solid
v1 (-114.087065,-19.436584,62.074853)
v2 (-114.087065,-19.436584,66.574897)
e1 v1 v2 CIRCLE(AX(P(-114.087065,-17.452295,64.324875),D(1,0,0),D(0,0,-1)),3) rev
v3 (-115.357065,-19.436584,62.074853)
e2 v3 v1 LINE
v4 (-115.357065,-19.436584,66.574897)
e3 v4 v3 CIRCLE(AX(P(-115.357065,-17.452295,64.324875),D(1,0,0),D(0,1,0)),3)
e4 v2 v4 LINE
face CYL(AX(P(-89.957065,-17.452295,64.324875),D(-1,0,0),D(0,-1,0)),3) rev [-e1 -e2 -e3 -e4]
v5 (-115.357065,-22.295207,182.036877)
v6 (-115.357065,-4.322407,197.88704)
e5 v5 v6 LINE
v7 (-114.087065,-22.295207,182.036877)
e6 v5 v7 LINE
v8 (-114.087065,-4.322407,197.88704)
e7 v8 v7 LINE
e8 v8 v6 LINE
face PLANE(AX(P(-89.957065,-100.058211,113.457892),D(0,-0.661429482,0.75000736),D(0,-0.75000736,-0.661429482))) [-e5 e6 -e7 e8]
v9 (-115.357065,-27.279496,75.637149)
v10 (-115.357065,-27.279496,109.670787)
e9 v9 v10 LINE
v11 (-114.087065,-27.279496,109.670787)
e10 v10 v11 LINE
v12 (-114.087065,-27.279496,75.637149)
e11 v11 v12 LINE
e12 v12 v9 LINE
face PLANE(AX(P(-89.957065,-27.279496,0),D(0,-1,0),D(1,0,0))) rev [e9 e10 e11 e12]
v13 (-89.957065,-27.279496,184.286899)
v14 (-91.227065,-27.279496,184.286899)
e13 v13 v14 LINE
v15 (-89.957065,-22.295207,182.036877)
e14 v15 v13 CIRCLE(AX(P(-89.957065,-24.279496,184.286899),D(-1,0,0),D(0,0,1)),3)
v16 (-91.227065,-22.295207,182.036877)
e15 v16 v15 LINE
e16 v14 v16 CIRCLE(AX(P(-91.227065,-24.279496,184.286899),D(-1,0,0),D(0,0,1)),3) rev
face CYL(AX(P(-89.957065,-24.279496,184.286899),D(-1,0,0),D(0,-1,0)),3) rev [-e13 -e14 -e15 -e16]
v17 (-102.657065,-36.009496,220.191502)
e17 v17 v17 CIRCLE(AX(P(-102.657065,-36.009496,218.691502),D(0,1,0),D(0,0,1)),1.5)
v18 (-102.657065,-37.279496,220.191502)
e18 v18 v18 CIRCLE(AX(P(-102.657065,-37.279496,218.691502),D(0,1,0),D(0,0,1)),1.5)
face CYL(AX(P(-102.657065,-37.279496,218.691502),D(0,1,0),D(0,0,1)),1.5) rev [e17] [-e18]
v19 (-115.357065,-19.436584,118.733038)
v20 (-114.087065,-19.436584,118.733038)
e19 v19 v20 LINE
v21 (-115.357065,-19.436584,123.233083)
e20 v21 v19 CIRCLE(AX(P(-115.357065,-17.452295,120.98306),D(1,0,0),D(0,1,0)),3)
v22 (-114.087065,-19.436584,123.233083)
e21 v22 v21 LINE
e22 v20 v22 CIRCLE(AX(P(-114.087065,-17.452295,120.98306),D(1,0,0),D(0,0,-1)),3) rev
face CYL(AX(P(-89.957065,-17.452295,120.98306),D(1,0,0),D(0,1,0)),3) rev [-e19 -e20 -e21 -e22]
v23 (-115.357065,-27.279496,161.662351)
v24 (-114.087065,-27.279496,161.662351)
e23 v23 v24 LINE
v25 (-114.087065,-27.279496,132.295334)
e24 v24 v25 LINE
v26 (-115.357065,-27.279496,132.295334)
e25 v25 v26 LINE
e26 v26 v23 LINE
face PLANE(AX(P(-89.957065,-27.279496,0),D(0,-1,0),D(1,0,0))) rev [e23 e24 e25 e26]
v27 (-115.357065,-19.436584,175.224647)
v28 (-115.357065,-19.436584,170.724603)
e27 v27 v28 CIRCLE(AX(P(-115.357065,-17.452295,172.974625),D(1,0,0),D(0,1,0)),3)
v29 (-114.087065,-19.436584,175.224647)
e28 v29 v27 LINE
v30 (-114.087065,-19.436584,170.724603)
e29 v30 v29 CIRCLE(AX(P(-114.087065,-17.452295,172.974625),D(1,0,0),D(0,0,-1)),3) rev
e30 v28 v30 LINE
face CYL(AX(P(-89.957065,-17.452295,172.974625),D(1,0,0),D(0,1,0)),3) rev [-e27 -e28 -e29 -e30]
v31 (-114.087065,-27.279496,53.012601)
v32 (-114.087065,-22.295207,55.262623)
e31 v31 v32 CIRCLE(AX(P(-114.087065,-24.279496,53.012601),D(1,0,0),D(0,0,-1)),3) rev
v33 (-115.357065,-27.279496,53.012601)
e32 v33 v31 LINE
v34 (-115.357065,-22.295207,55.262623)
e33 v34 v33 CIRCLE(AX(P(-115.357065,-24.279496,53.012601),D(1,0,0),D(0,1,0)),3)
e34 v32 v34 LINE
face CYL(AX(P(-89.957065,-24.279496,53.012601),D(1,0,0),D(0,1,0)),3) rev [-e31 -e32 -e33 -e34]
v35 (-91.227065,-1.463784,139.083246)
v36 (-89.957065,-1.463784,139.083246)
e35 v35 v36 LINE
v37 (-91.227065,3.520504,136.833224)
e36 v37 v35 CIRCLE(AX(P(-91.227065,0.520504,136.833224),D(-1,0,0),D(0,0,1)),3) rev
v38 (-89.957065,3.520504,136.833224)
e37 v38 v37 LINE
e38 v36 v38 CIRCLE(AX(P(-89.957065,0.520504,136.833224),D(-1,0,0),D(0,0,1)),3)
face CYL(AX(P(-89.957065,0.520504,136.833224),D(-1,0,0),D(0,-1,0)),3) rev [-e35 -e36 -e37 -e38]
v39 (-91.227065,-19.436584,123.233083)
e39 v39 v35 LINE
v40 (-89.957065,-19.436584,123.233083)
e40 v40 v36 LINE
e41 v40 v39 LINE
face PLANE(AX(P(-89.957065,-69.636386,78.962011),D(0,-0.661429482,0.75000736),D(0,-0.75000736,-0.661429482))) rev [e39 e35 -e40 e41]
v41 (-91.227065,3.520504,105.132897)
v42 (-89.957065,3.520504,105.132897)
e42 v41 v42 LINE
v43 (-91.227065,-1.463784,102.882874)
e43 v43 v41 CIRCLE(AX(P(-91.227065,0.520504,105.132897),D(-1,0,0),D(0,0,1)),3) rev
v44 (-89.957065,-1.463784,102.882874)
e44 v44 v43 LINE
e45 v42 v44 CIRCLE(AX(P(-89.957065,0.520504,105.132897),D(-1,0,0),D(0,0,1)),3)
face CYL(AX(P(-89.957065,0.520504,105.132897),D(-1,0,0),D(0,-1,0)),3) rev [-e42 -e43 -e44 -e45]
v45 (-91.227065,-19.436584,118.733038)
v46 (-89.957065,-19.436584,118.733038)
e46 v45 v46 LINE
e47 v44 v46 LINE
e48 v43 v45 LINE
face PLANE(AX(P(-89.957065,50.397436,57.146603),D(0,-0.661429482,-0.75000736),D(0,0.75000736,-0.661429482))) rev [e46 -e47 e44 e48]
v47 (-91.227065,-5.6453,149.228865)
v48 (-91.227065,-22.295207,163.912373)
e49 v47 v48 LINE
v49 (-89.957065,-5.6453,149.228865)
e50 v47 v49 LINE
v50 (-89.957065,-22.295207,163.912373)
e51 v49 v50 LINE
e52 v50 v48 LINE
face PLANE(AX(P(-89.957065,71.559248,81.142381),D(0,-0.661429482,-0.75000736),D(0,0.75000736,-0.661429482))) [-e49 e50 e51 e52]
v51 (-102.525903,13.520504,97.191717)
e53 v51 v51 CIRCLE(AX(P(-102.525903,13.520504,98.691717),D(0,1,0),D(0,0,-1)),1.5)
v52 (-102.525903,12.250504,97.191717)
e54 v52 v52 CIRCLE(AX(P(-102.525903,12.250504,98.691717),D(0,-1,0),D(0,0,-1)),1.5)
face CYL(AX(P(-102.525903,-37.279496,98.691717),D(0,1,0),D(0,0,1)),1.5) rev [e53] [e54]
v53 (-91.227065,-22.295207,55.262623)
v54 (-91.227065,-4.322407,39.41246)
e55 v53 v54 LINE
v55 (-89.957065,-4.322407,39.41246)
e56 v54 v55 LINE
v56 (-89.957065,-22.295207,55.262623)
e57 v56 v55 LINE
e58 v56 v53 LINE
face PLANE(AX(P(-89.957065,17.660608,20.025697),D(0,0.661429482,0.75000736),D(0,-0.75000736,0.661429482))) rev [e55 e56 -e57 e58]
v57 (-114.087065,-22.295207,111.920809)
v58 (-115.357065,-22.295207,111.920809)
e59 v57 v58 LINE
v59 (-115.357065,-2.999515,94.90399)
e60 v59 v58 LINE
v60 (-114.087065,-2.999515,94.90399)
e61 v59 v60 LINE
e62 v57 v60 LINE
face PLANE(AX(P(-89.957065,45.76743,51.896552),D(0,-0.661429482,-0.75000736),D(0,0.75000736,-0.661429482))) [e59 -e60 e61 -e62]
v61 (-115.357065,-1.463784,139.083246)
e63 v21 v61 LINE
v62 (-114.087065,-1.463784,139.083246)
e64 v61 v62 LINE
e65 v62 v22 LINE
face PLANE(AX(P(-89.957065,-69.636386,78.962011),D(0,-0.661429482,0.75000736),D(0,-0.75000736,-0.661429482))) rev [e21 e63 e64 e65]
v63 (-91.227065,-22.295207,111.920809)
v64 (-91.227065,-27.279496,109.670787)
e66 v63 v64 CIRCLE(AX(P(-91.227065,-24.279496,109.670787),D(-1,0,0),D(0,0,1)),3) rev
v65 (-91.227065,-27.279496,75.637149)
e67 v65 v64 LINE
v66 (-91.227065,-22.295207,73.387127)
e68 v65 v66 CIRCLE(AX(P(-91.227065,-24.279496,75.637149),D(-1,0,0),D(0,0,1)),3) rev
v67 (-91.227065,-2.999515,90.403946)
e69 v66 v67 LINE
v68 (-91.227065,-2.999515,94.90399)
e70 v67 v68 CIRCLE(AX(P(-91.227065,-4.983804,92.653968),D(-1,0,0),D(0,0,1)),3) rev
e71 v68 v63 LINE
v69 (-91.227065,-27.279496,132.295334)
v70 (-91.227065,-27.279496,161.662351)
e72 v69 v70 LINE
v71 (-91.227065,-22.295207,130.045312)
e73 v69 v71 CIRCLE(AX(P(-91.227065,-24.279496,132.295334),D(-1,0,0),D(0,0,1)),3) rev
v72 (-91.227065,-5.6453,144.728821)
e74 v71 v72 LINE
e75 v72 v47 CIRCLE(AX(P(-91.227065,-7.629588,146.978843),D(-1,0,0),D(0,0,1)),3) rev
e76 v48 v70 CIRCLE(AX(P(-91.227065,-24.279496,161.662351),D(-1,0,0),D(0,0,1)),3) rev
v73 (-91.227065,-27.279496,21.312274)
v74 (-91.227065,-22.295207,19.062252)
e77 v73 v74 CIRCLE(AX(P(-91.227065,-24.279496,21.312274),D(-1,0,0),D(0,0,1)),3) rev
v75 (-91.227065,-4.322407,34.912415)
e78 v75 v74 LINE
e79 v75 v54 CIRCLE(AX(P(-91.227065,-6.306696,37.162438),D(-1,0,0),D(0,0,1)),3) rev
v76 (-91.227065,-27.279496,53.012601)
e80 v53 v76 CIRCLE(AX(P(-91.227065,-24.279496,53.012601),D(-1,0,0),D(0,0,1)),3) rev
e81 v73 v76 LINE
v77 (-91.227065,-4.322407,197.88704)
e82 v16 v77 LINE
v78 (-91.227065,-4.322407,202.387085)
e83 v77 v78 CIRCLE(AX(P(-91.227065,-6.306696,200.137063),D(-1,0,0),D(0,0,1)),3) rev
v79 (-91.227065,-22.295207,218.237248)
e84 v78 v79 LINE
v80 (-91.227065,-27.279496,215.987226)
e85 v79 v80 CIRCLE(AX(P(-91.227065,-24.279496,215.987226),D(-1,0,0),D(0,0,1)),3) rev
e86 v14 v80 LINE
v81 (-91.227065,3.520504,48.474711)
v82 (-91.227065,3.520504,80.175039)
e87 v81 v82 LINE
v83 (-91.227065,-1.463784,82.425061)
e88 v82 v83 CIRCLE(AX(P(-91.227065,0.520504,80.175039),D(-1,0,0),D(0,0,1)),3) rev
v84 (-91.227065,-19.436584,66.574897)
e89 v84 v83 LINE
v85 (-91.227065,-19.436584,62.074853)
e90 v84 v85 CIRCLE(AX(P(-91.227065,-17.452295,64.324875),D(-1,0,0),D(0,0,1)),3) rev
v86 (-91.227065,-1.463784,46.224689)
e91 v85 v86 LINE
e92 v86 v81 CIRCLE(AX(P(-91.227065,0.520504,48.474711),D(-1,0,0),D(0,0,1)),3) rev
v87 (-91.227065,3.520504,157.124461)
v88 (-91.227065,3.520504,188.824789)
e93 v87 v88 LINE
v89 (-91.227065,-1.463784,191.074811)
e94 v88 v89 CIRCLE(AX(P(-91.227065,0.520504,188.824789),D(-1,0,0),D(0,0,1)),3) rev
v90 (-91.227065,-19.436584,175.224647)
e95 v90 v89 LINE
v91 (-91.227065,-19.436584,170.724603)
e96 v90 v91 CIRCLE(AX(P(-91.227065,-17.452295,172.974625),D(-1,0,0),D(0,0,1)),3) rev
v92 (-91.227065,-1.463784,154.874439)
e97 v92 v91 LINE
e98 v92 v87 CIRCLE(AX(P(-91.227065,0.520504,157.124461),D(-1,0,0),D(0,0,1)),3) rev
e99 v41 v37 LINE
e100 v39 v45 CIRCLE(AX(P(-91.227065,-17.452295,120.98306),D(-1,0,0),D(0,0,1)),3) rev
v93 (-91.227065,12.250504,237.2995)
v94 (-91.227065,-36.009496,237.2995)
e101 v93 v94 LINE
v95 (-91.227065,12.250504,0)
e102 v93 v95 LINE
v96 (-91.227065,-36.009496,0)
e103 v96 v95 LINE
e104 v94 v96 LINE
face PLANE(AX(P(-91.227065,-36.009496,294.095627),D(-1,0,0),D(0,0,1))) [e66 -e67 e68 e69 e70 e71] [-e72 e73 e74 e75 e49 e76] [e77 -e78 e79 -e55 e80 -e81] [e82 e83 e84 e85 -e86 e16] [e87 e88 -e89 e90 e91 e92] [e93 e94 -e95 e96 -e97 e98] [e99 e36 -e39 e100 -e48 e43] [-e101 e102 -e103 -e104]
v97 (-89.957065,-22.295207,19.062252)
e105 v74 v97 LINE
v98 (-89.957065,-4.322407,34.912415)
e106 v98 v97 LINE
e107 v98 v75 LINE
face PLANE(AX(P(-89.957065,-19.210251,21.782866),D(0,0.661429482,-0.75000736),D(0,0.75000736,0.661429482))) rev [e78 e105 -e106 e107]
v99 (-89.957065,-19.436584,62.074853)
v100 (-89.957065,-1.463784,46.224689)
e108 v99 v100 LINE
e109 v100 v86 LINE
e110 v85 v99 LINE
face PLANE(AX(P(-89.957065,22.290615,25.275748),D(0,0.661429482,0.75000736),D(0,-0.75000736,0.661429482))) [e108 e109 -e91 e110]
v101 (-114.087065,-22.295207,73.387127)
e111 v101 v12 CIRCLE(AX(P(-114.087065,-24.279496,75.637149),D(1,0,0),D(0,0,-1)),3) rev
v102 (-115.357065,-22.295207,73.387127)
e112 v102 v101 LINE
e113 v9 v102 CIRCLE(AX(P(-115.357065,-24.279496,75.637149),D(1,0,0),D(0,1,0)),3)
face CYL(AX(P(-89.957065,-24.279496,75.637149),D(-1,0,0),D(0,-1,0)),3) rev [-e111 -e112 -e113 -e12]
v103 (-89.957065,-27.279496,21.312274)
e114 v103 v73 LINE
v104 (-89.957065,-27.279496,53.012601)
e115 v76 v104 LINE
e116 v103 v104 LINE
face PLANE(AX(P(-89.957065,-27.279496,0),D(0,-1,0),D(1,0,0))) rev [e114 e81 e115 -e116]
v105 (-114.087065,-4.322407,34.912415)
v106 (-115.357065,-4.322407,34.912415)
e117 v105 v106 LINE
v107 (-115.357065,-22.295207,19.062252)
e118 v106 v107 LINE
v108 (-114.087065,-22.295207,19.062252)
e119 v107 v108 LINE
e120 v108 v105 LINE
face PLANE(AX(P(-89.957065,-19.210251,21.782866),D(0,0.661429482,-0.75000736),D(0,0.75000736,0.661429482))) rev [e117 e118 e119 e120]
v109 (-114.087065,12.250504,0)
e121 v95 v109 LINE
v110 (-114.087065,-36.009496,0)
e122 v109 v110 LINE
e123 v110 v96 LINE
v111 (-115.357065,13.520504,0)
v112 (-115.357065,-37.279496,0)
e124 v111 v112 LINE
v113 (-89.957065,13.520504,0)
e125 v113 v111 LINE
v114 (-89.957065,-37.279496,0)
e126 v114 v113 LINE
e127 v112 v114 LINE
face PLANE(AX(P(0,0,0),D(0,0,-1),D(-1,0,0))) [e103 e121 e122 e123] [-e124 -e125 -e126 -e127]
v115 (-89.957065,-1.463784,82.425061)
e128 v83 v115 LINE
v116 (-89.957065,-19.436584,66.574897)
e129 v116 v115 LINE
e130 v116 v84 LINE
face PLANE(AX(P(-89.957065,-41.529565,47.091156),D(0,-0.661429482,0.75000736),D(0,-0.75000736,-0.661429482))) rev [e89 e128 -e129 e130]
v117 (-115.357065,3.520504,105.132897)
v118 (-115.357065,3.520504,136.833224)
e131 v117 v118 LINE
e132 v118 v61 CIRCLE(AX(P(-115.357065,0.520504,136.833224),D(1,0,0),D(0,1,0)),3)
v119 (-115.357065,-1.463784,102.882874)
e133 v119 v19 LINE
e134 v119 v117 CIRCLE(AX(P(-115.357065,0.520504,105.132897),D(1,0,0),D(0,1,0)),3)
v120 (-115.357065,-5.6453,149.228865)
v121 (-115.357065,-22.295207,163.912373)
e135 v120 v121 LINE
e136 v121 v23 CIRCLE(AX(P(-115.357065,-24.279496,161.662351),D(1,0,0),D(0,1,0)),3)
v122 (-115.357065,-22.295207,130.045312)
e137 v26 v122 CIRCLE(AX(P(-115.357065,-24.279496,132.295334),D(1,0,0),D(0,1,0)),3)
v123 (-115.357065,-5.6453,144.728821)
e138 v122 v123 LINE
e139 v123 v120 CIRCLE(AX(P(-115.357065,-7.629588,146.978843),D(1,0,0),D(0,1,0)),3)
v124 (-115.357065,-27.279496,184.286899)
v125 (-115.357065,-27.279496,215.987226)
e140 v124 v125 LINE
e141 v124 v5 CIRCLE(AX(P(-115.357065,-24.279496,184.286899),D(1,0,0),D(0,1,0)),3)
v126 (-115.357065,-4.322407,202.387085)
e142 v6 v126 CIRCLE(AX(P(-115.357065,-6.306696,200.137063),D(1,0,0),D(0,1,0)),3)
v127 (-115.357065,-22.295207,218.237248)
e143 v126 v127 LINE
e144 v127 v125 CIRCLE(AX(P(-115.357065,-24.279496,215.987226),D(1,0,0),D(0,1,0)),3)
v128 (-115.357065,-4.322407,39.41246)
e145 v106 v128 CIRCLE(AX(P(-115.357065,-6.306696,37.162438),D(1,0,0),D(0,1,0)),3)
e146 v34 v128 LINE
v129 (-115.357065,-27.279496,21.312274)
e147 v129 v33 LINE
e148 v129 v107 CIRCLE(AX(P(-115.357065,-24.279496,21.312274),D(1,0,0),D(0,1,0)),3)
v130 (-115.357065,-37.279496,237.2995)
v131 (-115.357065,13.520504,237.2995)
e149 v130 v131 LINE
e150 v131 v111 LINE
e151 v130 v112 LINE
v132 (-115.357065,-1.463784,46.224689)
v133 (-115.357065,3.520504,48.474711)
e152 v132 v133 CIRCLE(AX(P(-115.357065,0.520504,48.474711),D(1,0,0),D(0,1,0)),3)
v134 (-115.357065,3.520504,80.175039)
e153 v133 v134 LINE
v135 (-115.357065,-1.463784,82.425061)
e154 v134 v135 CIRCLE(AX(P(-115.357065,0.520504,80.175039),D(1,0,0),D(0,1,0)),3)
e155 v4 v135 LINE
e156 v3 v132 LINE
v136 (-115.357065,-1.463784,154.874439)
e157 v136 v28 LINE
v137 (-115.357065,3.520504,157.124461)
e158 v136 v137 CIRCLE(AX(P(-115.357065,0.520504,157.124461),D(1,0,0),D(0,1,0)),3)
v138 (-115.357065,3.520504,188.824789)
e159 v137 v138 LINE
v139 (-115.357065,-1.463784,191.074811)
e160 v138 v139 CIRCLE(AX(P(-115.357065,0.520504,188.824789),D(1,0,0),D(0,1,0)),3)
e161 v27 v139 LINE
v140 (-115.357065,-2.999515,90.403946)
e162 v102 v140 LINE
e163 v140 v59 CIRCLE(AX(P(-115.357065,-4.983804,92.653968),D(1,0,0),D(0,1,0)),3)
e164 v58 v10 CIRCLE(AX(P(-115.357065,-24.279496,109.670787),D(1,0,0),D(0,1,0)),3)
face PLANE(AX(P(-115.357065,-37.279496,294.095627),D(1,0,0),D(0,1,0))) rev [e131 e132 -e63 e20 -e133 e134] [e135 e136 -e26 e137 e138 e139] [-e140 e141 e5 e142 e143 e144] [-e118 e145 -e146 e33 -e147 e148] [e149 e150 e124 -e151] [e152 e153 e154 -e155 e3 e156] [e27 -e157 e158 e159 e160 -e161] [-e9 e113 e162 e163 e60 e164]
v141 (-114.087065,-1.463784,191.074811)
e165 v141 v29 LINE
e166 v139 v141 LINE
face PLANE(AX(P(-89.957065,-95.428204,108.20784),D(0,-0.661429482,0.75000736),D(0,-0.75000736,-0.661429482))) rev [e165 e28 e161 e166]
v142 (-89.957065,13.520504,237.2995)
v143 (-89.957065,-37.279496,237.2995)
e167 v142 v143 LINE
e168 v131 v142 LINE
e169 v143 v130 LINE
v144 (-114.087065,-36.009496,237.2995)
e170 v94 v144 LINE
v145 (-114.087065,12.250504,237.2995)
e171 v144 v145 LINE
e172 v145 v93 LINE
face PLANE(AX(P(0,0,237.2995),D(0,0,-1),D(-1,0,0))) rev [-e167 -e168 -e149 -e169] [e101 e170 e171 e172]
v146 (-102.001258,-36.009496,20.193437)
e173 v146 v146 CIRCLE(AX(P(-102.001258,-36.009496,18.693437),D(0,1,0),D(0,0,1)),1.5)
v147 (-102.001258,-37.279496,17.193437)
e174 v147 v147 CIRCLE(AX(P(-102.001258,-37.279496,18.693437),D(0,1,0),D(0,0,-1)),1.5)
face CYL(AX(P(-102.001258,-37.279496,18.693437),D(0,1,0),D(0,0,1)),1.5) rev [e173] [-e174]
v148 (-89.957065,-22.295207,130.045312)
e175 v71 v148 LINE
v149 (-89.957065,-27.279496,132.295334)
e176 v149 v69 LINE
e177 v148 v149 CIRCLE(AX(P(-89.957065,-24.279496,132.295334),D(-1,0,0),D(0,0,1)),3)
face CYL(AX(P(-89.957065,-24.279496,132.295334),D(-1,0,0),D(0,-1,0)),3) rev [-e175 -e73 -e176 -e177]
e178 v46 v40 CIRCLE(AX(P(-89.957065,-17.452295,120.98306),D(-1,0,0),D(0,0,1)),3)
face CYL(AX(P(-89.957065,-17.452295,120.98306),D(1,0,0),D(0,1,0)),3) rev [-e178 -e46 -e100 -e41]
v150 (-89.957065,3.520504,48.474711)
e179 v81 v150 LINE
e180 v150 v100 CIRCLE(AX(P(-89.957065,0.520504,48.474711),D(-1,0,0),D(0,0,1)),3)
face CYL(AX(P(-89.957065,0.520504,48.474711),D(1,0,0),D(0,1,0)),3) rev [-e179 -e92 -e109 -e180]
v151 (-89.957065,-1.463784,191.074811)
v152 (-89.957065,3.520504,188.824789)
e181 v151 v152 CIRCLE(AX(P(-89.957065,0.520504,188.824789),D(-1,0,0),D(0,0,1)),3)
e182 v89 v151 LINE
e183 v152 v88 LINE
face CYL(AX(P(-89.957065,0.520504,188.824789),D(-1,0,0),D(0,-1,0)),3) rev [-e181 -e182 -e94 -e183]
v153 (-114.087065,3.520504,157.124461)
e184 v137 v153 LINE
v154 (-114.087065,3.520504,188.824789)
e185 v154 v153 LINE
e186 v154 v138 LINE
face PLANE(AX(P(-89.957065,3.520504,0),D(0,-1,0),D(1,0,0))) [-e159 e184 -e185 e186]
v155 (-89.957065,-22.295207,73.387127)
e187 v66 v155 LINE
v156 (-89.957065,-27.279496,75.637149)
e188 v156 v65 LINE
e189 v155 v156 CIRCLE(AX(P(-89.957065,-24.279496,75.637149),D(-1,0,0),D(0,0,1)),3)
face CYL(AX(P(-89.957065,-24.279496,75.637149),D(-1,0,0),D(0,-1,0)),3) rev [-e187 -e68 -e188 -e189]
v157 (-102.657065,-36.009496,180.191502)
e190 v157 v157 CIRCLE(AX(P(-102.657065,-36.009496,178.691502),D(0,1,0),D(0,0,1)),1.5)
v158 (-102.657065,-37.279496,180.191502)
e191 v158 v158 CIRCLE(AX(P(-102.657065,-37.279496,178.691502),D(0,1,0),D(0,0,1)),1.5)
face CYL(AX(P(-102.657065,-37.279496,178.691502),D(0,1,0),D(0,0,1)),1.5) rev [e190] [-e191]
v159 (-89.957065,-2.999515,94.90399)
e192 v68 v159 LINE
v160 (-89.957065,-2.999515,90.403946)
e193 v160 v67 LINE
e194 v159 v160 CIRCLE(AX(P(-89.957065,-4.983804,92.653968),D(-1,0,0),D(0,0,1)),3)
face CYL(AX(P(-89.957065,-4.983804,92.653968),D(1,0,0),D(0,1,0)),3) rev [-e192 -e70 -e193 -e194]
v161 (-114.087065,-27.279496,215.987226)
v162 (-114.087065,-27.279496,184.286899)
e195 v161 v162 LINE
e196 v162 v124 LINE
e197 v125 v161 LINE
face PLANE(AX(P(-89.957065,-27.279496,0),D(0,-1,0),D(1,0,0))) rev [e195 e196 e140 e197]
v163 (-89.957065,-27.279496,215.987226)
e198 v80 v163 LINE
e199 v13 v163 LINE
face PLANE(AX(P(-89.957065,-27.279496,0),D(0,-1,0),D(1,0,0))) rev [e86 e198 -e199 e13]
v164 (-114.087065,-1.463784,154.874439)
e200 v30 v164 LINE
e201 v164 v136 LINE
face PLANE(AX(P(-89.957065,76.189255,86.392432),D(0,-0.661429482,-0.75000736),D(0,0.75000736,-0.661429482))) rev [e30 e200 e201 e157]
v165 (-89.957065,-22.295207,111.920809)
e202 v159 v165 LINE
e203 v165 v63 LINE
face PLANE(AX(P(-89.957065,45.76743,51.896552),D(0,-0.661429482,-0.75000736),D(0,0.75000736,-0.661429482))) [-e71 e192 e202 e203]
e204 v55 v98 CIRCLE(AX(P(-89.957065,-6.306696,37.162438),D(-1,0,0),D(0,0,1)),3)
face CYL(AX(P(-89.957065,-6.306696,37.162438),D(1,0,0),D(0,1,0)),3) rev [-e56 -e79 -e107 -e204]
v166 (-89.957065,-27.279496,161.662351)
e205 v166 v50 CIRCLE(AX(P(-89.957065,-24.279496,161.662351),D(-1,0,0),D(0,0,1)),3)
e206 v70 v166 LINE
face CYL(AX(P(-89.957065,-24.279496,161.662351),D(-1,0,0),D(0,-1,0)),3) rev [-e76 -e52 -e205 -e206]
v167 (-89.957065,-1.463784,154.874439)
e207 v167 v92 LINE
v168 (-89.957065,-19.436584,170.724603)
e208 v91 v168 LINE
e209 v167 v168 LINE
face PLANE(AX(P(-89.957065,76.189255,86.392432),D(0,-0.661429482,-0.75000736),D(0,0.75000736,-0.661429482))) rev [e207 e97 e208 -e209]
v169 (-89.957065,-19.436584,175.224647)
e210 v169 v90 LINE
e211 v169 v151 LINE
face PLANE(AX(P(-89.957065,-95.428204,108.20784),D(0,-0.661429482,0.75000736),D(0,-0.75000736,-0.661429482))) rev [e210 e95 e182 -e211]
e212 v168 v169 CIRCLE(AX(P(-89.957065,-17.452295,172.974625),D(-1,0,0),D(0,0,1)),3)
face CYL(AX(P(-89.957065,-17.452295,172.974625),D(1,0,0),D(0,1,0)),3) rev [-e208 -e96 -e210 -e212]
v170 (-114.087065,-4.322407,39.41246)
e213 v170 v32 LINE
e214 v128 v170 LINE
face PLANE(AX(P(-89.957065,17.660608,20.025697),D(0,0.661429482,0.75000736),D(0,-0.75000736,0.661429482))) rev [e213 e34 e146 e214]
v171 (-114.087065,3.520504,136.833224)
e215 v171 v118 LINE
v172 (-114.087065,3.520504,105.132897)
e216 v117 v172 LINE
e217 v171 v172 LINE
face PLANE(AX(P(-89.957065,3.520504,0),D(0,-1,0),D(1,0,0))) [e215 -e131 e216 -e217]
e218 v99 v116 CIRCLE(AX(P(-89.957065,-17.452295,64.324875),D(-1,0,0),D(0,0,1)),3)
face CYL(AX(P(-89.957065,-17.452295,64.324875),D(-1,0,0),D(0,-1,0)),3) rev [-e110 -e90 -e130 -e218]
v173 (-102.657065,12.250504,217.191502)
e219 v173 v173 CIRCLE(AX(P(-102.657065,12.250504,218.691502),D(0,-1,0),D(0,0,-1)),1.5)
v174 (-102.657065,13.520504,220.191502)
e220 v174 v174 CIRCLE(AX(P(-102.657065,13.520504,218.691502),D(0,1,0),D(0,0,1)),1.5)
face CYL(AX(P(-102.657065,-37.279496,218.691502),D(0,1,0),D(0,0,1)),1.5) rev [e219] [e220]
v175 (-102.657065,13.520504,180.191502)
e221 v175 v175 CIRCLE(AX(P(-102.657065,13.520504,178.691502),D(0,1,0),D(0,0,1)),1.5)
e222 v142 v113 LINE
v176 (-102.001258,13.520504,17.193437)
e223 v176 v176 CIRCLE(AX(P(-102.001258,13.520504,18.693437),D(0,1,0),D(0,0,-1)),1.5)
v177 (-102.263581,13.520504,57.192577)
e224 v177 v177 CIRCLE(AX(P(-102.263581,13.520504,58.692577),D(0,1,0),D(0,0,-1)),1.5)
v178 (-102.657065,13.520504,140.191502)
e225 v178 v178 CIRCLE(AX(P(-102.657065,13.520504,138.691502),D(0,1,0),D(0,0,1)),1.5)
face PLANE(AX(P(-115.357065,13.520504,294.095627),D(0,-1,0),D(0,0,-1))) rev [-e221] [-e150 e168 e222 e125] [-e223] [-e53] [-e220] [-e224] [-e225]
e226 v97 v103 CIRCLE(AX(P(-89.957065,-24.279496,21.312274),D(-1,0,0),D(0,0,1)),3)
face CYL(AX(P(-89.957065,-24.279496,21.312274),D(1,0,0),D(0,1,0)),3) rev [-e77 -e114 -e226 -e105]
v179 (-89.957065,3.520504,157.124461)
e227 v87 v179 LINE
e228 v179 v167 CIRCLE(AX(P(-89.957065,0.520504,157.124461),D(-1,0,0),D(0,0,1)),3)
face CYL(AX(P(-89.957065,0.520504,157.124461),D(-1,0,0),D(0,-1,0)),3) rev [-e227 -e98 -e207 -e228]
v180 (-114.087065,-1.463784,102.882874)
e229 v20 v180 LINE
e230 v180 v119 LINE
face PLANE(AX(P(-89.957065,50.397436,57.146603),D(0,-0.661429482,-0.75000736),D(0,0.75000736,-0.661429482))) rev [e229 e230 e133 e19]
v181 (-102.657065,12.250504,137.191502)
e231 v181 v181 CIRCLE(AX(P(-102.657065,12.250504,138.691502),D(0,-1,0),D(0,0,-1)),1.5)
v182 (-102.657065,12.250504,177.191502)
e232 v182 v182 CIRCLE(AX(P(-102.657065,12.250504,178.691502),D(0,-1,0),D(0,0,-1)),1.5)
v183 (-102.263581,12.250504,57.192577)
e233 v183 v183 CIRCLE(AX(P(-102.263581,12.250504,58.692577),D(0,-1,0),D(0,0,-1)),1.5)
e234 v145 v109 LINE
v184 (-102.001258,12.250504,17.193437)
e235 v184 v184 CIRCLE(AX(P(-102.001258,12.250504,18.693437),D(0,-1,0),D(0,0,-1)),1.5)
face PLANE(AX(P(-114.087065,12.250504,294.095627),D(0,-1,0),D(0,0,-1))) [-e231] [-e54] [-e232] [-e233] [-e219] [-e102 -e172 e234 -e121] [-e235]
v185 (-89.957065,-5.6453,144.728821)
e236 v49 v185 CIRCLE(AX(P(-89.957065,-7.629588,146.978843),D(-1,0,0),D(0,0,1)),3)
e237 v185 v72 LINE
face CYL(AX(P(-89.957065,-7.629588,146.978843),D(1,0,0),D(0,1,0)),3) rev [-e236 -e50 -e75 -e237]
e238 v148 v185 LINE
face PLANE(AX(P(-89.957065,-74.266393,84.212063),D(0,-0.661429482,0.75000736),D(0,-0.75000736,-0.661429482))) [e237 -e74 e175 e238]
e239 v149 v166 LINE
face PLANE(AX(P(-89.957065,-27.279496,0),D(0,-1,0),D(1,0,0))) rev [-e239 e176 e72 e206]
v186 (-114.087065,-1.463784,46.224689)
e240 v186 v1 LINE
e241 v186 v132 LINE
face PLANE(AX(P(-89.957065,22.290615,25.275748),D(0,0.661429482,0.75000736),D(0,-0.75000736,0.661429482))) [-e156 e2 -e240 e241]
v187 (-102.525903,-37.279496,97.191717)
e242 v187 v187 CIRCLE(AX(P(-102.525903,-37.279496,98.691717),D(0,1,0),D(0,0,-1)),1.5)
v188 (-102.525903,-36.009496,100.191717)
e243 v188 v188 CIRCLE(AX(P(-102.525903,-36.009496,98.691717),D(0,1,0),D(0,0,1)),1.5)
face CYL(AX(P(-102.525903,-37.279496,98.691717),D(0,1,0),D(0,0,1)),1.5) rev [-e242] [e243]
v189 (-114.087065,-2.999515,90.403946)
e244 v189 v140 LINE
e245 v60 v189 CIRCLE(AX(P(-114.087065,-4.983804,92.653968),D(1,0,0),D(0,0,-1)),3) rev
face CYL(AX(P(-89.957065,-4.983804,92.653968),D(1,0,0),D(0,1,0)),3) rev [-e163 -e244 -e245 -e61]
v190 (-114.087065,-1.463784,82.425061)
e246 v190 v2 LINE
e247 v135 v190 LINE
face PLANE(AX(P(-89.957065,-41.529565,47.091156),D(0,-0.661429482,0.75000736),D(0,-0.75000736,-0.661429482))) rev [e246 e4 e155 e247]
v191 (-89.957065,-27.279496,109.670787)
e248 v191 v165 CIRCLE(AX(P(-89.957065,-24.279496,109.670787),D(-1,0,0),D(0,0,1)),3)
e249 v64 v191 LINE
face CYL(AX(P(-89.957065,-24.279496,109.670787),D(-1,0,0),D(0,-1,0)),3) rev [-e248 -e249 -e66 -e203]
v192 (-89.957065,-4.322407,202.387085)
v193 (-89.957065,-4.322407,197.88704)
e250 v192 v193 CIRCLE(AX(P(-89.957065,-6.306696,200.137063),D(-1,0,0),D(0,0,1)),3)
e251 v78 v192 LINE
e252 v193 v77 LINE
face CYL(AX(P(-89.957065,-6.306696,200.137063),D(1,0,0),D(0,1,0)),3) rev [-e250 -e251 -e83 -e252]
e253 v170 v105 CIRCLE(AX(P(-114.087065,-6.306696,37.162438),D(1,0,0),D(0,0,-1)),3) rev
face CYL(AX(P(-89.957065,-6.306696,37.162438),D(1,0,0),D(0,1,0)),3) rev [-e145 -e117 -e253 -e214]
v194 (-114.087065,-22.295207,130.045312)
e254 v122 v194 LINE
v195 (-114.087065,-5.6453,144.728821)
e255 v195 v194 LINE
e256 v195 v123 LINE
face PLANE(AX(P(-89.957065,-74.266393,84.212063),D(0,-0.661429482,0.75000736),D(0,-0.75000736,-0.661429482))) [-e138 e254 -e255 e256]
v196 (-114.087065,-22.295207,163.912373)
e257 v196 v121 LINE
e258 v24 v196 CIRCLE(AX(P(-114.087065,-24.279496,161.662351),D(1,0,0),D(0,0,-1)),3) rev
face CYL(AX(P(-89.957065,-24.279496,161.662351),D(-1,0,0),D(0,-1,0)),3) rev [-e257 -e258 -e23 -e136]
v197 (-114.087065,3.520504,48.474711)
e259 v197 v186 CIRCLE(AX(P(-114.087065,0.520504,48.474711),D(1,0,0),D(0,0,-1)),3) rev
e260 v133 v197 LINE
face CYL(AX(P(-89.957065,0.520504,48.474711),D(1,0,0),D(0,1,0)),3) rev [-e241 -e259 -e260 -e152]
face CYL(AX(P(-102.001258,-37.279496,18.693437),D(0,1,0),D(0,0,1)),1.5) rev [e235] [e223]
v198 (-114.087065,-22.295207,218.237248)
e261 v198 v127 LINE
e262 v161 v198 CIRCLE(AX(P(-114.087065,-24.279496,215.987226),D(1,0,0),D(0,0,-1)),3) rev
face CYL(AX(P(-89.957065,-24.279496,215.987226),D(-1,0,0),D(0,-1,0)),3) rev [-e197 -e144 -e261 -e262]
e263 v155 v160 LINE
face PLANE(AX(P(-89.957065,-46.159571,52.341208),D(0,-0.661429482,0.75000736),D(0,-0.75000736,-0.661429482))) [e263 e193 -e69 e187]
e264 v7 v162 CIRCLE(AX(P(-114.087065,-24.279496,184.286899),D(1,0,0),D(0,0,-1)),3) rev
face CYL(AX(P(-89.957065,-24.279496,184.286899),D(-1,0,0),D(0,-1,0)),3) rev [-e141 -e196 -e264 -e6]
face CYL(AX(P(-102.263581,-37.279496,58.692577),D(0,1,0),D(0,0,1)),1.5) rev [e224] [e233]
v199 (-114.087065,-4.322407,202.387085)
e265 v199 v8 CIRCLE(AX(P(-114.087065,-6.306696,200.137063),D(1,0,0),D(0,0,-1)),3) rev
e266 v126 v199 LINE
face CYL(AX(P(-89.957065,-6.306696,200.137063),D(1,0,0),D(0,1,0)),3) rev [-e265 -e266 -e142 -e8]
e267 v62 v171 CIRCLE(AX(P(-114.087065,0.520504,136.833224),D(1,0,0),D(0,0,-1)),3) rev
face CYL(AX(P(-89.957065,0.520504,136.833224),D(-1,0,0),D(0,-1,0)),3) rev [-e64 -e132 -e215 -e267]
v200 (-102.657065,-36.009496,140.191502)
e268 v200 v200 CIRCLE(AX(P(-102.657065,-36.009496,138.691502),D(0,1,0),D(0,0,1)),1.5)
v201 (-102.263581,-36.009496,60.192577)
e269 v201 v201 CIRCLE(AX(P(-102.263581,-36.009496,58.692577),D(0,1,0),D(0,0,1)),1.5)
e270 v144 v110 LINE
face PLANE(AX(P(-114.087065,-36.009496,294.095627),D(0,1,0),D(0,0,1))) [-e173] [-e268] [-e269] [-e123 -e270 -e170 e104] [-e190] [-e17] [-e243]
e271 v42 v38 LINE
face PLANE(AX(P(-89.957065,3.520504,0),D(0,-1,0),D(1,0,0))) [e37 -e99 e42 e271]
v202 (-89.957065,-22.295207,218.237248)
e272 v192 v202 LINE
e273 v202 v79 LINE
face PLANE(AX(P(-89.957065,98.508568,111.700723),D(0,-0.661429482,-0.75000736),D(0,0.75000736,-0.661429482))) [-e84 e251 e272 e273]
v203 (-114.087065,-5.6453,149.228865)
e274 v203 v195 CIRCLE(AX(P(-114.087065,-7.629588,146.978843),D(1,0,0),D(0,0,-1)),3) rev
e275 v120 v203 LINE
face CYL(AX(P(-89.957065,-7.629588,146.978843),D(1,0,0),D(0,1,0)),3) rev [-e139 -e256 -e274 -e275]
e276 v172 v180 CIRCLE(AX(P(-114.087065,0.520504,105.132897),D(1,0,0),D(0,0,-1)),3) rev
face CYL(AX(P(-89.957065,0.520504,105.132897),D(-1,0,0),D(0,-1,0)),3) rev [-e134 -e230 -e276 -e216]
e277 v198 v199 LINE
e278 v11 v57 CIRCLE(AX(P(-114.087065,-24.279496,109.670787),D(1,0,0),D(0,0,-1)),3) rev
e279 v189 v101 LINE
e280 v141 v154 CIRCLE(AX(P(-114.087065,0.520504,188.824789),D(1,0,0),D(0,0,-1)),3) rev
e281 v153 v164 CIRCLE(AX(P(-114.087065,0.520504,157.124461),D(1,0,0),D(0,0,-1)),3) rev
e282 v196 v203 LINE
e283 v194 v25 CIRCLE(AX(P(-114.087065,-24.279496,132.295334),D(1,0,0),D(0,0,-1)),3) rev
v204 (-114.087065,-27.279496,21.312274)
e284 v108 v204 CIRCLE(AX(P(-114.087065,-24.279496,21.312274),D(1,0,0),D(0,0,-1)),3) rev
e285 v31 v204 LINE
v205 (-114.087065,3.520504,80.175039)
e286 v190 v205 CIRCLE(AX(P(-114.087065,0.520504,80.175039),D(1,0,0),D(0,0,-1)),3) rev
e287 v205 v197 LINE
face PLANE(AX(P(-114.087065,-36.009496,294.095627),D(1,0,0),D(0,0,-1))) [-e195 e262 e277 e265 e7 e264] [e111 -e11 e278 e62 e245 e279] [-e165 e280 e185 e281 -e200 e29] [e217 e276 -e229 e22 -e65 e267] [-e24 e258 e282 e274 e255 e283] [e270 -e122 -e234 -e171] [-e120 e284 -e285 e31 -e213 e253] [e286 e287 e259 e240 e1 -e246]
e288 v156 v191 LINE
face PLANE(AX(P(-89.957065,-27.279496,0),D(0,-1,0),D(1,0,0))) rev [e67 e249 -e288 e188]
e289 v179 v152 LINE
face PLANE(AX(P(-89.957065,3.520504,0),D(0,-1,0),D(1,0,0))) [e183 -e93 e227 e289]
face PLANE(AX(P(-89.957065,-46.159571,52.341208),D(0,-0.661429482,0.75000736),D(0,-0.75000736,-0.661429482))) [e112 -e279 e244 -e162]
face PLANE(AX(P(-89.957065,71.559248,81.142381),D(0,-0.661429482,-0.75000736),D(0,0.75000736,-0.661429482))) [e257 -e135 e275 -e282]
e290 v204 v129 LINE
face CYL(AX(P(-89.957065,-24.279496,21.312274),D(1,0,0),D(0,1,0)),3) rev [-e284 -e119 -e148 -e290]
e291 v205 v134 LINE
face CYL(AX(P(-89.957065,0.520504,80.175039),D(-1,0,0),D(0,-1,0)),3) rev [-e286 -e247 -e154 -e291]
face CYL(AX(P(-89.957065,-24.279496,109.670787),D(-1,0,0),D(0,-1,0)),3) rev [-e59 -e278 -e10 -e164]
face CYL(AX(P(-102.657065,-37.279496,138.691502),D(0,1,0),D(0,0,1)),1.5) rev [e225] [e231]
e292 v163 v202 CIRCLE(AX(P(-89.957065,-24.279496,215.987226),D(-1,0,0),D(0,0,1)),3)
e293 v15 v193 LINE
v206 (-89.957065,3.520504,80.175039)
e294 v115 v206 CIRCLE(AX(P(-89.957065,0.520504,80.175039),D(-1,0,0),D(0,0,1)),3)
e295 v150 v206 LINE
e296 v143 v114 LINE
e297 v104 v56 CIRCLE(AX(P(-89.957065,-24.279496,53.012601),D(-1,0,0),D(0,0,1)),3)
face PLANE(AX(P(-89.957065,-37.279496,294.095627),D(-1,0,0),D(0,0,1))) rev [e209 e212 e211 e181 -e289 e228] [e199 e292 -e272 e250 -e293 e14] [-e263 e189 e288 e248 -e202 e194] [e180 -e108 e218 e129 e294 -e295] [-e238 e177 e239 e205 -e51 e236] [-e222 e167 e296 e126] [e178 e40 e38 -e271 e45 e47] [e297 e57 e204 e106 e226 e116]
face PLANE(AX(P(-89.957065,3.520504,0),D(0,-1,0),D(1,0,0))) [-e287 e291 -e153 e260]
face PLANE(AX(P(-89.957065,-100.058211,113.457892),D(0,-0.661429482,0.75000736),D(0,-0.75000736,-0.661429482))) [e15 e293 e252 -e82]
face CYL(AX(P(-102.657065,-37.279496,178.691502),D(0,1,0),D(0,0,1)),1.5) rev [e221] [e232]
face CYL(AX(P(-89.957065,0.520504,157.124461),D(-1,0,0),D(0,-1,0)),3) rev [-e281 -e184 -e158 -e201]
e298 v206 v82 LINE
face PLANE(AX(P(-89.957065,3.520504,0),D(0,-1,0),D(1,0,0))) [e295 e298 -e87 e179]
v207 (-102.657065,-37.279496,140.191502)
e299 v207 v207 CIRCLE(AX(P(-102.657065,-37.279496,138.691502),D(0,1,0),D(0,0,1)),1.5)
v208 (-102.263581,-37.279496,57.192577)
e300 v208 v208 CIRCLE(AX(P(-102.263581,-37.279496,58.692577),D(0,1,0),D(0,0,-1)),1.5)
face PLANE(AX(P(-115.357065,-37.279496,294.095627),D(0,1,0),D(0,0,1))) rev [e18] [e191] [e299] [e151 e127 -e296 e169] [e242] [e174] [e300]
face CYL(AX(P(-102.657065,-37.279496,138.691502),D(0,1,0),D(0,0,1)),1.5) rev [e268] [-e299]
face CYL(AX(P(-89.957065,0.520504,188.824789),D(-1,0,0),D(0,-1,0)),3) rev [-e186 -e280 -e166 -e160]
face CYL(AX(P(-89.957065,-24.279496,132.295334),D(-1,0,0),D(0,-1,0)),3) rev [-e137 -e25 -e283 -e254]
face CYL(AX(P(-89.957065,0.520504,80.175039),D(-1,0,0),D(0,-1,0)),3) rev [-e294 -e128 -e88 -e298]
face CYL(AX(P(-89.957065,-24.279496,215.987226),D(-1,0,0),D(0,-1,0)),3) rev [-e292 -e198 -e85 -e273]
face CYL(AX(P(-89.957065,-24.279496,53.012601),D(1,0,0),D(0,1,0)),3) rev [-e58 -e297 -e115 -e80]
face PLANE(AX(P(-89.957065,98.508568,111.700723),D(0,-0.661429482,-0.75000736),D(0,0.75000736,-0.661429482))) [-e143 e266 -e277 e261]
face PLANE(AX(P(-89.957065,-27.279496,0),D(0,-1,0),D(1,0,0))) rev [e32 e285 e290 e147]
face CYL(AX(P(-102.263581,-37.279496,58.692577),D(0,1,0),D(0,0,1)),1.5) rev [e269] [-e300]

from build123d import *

# Parameters (mm, degrees)
SKETCH1_W           = 25.4
SKETCH1_H           = 50.8
SKETCH1_W_2         = 22.86
SKETCH1_H_2         = 48.26
BOSS_EXTRUDE1_DEPTH = 237.2995
CUT_EXTRUDE1_DEPTH  = 242.549111961
FILLET1_R           = 3
MIRROR1_START       = -91.227065342
MIRROR1_DEPTH       = 1.27
SKETCH6_R           = 1.5
CUT_EXTRUDE2_DEPTH  = 269.69861411


# Read off the part's stored shape, not the designer's step: Mirror1
with BuildPart() as part:
    # Sketch1 → Boss-Extrude1 (new body)
    with BuildSketch(Plane.XY):
        with Locations((-102.657065342, -11.879495554)):
            Rectangle(SKETCH1_W, SKETCH1_H)
        with Locations((-102.657065342, -11.879495554)):
            Rectangle(SKETCH1_W_2, SKETCH1_H_2, mode=Mode.SUBTRACT)
    extrude(amount=BOSS_EXTRUDE1_DEPTH)

    # Sketch5 → Cut-Extrude1 (cut, through all)
    with BuildSketch(Plane.ZY.offset(115.357065342)):
        Polygon((59.65825413, -27.279495554), (37.1624375, -1.771064943), (14.66662087, -27.279495554), align=None)
        Polygon((68.99149587, -27.279495554), (92.653967718, -0.448172595), (116.316439565, -27.279495554), align=None)
        Polygon((98.487243806, 3.520504446), (143.478877065, 3.520504446), (120.983060435, -21.987926165), align=None)
        Polygon((125.649681306, -27.279495554), (146.978842718, -3.09395729), (168.30800413, -27.279495554), align=None)
        Polygon((150.47880837, 3.520504446), (195.47044163, 3.520504446), (172.974625, -21.987926165), align=None)
        Polygon((177.64124587, -27.279495554), (200.1370625, -1.771064943), (222.63287913, -27.279495554), align=None)
        Polygon((41.82905837, 3.520504446), (86.82069163, 3.520504446), (64.324875, -21.987926165), align=None)
    extrude(amount=-CUT_EXTRUDE1_DEPTH, mode=Mode.SUBTRACT)

    # Fillet1
    fillet1_edges = [part.edges().sort_by_distance(p)[0] for p in [
        (-114.722065342, 3.520504446, 41.82905837),
        (-114.722065342, 3.520504446, 86.82069163),
        (-114.722065342, -21.987926165, 64.324875),
        (-114.722065342, -1.771064943, 37.1624375),
        (-114.722065342, -27.279495554, 59.65825413),
        (-114.722065342, -27.279495554, 14.66662087),
        (-114.722065342, -27.279495554, 125.649681306),
        (-114.722065342, -3.09395729, 146.978842718),
        (-114.722065342, -27.279495554, 168.30800413),
        (-114.722065342, 3.520504446, 150.47880837),
        (-114.722065342, 3.520504446, 195.47044163),
        (-114.722065342, -21.987926165, 172.974625),
        (-114.722065342, -27.279495554, 68.99149587),
        (-114.722065342, -0.448172595, 92.653967718),
        (-114.722065342, -27.279495554, 116.316439565),
        (-114.722065342, 3.520504446, 98.487243806),
        (-114.722065342, 3.520504446, 143.478877065),
        (-114.722065342, -21.987926165, 120.983060435),
        (-114.722065342, -27.279495554, 177.64124587),
        (-114.722065342, -1.771064943, 200.1370625),
        (-114.722065342, -27.279495554, 222.63287913),
    ]]
    fillet(fillet1_edges, radius=FILLET1_R)

    # Mirror1 outline → Mirror1 (add)
    with BuildSketch(Plane.YZ.offset(MIRROR1_START)):
        with BuildLine():
            ThreePointArc((-19.436583706, 170.724602919), (-20.45229526, 172.974625), (-19.436583706, 175.224647081))
            Line((-19.436583706, 175.224647081), (-21.987926165, 172.974625))
            Line((-21.987926165, 172.974625), (-19.436583706, 170.724602919))
        make_face()
        with BuildLine():
            Line((3.520504446, 195.47044163), (-1.463784, 191.074811))
            ThreePointArc((-1.463784, 191.074811), (1.754833143, 191.559095535), (3.520504446, 188.824788919))
            Line((3.520504446, 188.824788919), (3.520504446, 195.47044163))
        make_face()
        with BuildLine():
            ThreePointArc((3.520504446, 157.124461081), (1.754833143, 154.390154465), (-1.463784, 154.874439))
            Line((-1.463784, 154.874439), (3.520504446, 150.47880837))
            Line((3.520504446, 150.47880837), (3.520504446, 157.124461081))
        make_face()
        with BuildLine():
            Line((3.520504446, 143.478877065), (-1.463784, 139.083246435))
            ThreePointArc((-1.463784, 139.083246435), (1.754833143, 139.56753097), (3.520504446, 136.833224354))
            Line((3.520504446, 136.833224354), (3.520504446, 143.478877065))
        make_face()
        with BuildLine():
            ThreePointArc((-19.436583706, 118.733038355), (-20.45229526, 120.983060435), (-19.436583706, 123.233082516))
            Line((-19.436583706, 123.233082516), (-21.987926165, 120.983060435))
            Line((-21.987926165, 120.983060435), (-19.436583706, 118.733038355))
        make_face()
        with BuildLine():
            Line((3.520504446, 98.487243806), (3.520504446, 105.132896516))
            ThreePointArc((3.520504446, 105.132896516), (1.754833143, 102.3985899), (-1.463784, 102.882874435))
            Line((-1.463784, 102.882874435), (3.520504446, 98.487243806))
        make_face()
        with BuildLine():
            Line((-27.279495554, 125.649681306), (-22.295207108, 130.045311935))
            ThreePointArc((-22.295207108, 130.045311935), (-25.513824251, 129.5610274), (-27.279495554, 132.295334016))
            Line((-27.279495554, 132.295334016), (-27.279495554, 125.649681306))
        make_face()
        with BuildLine():
            ThreePointArc((-5.645299749, 149.228864798), (-4.629588195, 146.978842718), (-5.645299749, 144.728820637))
            Line((-5.645299749, 144.728820637), (-3.09395729, 146.978842718))
            Line((-3.09395729, 146.978842718), (-5.645299749, 149.228864798))
        make_face()
        with BuildLine():
            Line((-27.279495554, 168.30800413), (-27.279495554, 161.662351419))
            ThreePointArc((-27.279495554, 161.662351419), (-25.513824251, 164.396658035), (-22.295207108, 163.9123735))
            Line((-22.295207108, 163.9123735), (-27.279495554, 168.30800413))
        make_face()
        with BuildLine():
            Line((-27.279495554, 177.64124587), (-22.295207108, 182.0368765))
            ThreePointArc((-22.295207108, 182.0368765), (-25.513824251, 181.552591965), (-27.279495554, 184.286898581))
            Line((-27.279495554, 184.286898581), (-27.279495554, 177.64124587))
        make_face()
        with BuildLine():
            ThreePointArc((-4.322407402, 202.387084581), (-3.306695848, 200.1370625), (-4.322407402, 197.887040419))
            Line((-4.322407402, 197.887040419), (-1.771064943, 200.1370625))
            Line((-1.771064943, 200.1370625), (-4.322407402, 202.387084581))
        make_face()
        with BuildLine():
            Line((-27.279495554, 222.63287913), (-27.279495554, 215.987226419))
            ThreePointArc((-27.279495554, 215.987226419), (-25.513824251, 218.721533035), (-22.295207108, 218.2372485))
            Line((-22.295207108, 218.2372485), (-27.279495554, 222.63287913))
        make_face()
        with BuildLine():
            Line((-27.279495554, 116.316439565), (-27.279495554, 109.670786854))
            ThreePointArc((-27.279495554, 109.670786854), (-25.513824251, 112.40509347), (-22.295207108, 111.920808935))
            Line((-22.295207108, 111.920808935), (-27.279495554, 116.316439565))
        make_face()
        with BuildLine():
            ThreePointArc((-22.295207108, 73.3871265), (-25.513824251, 72.902841965), (-27.279495554, 75.637148581))
            Line((-27.279495554, 75.637148581), (-27.279495554, 68.99149587))
            Line((-27.279495554, 68.99149587), (-22.295207108, 73.3871265))
        make_face()
        with BuildLine():
            Line((-0.448172595, 92.653967718), (-2.999515054, 94.903989798))
            ThreePointArc((-2.999515054, 94.903989798), (-1.9838035, 92.653967717), (-2.999515054, 90.403945637))
            Line((-2.999515054, 90.403945637), (-0.448172595, 92.653967718))
        make_face()
        with BuildLine():
            Line((3.520504446, 86.82069163), (-1.463784, 82.425061))
            ThreePointArc((-1.463784, 82.425061), (1.754833143, 82.909345535), (3.520504446, 80.175038919))
            Line((3.520504446, 80.175038919), (3.520504446, 86.82069163))
        make_face()
        with BuildLine():
            ThreePointArc((-19.436583706, 62.074852919), (-20.45229526, 64.324875), (-19.436583706, 66.574897081))
            Line((-19.436583706, 66.574897081), (-21.987926165, 64.324875))
            Line((-21.987926165, 64.324875), (-19.436583706, 62.074852919))
        make_face()
        with BuildLine():
            Line((3.520504446, 41.82905837), (3.520504446, 48.474711081))
            ThreePointArc((3.520504446, 48.474711081), (1.754833143, 45.740404465), (-1.463784, 46.224689))
            Line((-1.463784, 46.224689), (3.520504446, 41.82905837))
        make_face()
        with BuildLine():
            ThreePointArc((-27.279495554, 53.012601419), (-25.513824251, 55.746908035), (-22.295207108, 55.2626235))
            Line((-22.295207108, 55.2626235), (-27.279495554, 59.65825413))
            Line((-27.279495554, 59.65825413), (-27.279495554, 53.012601419))
        make_face()
        with BuildLine():
            Line((-1.771064943, 37.1624375), (-4.322407402, 39.412459581))
            ThreePointArc((-4.322407402, 39.412459581), (-3.306695848, 37.1624375), (-4.322407402, 34.912415419))
            Line((-4.322407402, 34.912415419), (-1.771064943, 37.1624375))
        make_face()
        with BuildLine():
            ThreePointArc((-22.295207108, 19.0622515), (-25.513824251, 18.577966965), (-27.279495554, 21.312273581))
            Line((-27.279495554, 21.312273581), (-27.279495554, 14.66662087))
            Line((-27.279495554, 14.66662087), (-22.295207108, 19.0622515))
        make_face()
    extrude(amount=MIRROR1_DEPTH)

    # Sketch6 → Cut-Extrude2 (cut, through all)
    with BuildSketch(Plane(origin=(0, 13.520504446, 0), x_dir=(1, 0, 0), z_dir=(0, 1, 0))):
        with Locations(Location((-102.657065342, -138.6915017, 0), (0, 0, 270))):
            Circle(SKETCH6_R)
        with Locations(Location((-102.657065342, -178.6915017, 0), (0, 0, 270))):
            Circle(SKETCH6_R)
        with Locations(Location((-102.657065342, -218.6915017, 0), (0, 0, 270))):
            Circle(SKETCH6_R)
        with Locations(Location((-102.001257873, -18.693437093, 0), (0, 0, 90))):
            Circle(SKETCH6_R)
        with Locations(Location((-102.263580578, -58.692576918, 0), (0, 0, 90))):
            Circle(SKETCH6_R)
        with Locations(Location((-102.525903284, -98.691716744, 0), (0, 0, 90))):
            Circle(SKETCH6_R)
    extrude(amount=-CUT_EXTRUDE2_DEPTH, mode=Mode.SUBTRACT)


solid = part.part
